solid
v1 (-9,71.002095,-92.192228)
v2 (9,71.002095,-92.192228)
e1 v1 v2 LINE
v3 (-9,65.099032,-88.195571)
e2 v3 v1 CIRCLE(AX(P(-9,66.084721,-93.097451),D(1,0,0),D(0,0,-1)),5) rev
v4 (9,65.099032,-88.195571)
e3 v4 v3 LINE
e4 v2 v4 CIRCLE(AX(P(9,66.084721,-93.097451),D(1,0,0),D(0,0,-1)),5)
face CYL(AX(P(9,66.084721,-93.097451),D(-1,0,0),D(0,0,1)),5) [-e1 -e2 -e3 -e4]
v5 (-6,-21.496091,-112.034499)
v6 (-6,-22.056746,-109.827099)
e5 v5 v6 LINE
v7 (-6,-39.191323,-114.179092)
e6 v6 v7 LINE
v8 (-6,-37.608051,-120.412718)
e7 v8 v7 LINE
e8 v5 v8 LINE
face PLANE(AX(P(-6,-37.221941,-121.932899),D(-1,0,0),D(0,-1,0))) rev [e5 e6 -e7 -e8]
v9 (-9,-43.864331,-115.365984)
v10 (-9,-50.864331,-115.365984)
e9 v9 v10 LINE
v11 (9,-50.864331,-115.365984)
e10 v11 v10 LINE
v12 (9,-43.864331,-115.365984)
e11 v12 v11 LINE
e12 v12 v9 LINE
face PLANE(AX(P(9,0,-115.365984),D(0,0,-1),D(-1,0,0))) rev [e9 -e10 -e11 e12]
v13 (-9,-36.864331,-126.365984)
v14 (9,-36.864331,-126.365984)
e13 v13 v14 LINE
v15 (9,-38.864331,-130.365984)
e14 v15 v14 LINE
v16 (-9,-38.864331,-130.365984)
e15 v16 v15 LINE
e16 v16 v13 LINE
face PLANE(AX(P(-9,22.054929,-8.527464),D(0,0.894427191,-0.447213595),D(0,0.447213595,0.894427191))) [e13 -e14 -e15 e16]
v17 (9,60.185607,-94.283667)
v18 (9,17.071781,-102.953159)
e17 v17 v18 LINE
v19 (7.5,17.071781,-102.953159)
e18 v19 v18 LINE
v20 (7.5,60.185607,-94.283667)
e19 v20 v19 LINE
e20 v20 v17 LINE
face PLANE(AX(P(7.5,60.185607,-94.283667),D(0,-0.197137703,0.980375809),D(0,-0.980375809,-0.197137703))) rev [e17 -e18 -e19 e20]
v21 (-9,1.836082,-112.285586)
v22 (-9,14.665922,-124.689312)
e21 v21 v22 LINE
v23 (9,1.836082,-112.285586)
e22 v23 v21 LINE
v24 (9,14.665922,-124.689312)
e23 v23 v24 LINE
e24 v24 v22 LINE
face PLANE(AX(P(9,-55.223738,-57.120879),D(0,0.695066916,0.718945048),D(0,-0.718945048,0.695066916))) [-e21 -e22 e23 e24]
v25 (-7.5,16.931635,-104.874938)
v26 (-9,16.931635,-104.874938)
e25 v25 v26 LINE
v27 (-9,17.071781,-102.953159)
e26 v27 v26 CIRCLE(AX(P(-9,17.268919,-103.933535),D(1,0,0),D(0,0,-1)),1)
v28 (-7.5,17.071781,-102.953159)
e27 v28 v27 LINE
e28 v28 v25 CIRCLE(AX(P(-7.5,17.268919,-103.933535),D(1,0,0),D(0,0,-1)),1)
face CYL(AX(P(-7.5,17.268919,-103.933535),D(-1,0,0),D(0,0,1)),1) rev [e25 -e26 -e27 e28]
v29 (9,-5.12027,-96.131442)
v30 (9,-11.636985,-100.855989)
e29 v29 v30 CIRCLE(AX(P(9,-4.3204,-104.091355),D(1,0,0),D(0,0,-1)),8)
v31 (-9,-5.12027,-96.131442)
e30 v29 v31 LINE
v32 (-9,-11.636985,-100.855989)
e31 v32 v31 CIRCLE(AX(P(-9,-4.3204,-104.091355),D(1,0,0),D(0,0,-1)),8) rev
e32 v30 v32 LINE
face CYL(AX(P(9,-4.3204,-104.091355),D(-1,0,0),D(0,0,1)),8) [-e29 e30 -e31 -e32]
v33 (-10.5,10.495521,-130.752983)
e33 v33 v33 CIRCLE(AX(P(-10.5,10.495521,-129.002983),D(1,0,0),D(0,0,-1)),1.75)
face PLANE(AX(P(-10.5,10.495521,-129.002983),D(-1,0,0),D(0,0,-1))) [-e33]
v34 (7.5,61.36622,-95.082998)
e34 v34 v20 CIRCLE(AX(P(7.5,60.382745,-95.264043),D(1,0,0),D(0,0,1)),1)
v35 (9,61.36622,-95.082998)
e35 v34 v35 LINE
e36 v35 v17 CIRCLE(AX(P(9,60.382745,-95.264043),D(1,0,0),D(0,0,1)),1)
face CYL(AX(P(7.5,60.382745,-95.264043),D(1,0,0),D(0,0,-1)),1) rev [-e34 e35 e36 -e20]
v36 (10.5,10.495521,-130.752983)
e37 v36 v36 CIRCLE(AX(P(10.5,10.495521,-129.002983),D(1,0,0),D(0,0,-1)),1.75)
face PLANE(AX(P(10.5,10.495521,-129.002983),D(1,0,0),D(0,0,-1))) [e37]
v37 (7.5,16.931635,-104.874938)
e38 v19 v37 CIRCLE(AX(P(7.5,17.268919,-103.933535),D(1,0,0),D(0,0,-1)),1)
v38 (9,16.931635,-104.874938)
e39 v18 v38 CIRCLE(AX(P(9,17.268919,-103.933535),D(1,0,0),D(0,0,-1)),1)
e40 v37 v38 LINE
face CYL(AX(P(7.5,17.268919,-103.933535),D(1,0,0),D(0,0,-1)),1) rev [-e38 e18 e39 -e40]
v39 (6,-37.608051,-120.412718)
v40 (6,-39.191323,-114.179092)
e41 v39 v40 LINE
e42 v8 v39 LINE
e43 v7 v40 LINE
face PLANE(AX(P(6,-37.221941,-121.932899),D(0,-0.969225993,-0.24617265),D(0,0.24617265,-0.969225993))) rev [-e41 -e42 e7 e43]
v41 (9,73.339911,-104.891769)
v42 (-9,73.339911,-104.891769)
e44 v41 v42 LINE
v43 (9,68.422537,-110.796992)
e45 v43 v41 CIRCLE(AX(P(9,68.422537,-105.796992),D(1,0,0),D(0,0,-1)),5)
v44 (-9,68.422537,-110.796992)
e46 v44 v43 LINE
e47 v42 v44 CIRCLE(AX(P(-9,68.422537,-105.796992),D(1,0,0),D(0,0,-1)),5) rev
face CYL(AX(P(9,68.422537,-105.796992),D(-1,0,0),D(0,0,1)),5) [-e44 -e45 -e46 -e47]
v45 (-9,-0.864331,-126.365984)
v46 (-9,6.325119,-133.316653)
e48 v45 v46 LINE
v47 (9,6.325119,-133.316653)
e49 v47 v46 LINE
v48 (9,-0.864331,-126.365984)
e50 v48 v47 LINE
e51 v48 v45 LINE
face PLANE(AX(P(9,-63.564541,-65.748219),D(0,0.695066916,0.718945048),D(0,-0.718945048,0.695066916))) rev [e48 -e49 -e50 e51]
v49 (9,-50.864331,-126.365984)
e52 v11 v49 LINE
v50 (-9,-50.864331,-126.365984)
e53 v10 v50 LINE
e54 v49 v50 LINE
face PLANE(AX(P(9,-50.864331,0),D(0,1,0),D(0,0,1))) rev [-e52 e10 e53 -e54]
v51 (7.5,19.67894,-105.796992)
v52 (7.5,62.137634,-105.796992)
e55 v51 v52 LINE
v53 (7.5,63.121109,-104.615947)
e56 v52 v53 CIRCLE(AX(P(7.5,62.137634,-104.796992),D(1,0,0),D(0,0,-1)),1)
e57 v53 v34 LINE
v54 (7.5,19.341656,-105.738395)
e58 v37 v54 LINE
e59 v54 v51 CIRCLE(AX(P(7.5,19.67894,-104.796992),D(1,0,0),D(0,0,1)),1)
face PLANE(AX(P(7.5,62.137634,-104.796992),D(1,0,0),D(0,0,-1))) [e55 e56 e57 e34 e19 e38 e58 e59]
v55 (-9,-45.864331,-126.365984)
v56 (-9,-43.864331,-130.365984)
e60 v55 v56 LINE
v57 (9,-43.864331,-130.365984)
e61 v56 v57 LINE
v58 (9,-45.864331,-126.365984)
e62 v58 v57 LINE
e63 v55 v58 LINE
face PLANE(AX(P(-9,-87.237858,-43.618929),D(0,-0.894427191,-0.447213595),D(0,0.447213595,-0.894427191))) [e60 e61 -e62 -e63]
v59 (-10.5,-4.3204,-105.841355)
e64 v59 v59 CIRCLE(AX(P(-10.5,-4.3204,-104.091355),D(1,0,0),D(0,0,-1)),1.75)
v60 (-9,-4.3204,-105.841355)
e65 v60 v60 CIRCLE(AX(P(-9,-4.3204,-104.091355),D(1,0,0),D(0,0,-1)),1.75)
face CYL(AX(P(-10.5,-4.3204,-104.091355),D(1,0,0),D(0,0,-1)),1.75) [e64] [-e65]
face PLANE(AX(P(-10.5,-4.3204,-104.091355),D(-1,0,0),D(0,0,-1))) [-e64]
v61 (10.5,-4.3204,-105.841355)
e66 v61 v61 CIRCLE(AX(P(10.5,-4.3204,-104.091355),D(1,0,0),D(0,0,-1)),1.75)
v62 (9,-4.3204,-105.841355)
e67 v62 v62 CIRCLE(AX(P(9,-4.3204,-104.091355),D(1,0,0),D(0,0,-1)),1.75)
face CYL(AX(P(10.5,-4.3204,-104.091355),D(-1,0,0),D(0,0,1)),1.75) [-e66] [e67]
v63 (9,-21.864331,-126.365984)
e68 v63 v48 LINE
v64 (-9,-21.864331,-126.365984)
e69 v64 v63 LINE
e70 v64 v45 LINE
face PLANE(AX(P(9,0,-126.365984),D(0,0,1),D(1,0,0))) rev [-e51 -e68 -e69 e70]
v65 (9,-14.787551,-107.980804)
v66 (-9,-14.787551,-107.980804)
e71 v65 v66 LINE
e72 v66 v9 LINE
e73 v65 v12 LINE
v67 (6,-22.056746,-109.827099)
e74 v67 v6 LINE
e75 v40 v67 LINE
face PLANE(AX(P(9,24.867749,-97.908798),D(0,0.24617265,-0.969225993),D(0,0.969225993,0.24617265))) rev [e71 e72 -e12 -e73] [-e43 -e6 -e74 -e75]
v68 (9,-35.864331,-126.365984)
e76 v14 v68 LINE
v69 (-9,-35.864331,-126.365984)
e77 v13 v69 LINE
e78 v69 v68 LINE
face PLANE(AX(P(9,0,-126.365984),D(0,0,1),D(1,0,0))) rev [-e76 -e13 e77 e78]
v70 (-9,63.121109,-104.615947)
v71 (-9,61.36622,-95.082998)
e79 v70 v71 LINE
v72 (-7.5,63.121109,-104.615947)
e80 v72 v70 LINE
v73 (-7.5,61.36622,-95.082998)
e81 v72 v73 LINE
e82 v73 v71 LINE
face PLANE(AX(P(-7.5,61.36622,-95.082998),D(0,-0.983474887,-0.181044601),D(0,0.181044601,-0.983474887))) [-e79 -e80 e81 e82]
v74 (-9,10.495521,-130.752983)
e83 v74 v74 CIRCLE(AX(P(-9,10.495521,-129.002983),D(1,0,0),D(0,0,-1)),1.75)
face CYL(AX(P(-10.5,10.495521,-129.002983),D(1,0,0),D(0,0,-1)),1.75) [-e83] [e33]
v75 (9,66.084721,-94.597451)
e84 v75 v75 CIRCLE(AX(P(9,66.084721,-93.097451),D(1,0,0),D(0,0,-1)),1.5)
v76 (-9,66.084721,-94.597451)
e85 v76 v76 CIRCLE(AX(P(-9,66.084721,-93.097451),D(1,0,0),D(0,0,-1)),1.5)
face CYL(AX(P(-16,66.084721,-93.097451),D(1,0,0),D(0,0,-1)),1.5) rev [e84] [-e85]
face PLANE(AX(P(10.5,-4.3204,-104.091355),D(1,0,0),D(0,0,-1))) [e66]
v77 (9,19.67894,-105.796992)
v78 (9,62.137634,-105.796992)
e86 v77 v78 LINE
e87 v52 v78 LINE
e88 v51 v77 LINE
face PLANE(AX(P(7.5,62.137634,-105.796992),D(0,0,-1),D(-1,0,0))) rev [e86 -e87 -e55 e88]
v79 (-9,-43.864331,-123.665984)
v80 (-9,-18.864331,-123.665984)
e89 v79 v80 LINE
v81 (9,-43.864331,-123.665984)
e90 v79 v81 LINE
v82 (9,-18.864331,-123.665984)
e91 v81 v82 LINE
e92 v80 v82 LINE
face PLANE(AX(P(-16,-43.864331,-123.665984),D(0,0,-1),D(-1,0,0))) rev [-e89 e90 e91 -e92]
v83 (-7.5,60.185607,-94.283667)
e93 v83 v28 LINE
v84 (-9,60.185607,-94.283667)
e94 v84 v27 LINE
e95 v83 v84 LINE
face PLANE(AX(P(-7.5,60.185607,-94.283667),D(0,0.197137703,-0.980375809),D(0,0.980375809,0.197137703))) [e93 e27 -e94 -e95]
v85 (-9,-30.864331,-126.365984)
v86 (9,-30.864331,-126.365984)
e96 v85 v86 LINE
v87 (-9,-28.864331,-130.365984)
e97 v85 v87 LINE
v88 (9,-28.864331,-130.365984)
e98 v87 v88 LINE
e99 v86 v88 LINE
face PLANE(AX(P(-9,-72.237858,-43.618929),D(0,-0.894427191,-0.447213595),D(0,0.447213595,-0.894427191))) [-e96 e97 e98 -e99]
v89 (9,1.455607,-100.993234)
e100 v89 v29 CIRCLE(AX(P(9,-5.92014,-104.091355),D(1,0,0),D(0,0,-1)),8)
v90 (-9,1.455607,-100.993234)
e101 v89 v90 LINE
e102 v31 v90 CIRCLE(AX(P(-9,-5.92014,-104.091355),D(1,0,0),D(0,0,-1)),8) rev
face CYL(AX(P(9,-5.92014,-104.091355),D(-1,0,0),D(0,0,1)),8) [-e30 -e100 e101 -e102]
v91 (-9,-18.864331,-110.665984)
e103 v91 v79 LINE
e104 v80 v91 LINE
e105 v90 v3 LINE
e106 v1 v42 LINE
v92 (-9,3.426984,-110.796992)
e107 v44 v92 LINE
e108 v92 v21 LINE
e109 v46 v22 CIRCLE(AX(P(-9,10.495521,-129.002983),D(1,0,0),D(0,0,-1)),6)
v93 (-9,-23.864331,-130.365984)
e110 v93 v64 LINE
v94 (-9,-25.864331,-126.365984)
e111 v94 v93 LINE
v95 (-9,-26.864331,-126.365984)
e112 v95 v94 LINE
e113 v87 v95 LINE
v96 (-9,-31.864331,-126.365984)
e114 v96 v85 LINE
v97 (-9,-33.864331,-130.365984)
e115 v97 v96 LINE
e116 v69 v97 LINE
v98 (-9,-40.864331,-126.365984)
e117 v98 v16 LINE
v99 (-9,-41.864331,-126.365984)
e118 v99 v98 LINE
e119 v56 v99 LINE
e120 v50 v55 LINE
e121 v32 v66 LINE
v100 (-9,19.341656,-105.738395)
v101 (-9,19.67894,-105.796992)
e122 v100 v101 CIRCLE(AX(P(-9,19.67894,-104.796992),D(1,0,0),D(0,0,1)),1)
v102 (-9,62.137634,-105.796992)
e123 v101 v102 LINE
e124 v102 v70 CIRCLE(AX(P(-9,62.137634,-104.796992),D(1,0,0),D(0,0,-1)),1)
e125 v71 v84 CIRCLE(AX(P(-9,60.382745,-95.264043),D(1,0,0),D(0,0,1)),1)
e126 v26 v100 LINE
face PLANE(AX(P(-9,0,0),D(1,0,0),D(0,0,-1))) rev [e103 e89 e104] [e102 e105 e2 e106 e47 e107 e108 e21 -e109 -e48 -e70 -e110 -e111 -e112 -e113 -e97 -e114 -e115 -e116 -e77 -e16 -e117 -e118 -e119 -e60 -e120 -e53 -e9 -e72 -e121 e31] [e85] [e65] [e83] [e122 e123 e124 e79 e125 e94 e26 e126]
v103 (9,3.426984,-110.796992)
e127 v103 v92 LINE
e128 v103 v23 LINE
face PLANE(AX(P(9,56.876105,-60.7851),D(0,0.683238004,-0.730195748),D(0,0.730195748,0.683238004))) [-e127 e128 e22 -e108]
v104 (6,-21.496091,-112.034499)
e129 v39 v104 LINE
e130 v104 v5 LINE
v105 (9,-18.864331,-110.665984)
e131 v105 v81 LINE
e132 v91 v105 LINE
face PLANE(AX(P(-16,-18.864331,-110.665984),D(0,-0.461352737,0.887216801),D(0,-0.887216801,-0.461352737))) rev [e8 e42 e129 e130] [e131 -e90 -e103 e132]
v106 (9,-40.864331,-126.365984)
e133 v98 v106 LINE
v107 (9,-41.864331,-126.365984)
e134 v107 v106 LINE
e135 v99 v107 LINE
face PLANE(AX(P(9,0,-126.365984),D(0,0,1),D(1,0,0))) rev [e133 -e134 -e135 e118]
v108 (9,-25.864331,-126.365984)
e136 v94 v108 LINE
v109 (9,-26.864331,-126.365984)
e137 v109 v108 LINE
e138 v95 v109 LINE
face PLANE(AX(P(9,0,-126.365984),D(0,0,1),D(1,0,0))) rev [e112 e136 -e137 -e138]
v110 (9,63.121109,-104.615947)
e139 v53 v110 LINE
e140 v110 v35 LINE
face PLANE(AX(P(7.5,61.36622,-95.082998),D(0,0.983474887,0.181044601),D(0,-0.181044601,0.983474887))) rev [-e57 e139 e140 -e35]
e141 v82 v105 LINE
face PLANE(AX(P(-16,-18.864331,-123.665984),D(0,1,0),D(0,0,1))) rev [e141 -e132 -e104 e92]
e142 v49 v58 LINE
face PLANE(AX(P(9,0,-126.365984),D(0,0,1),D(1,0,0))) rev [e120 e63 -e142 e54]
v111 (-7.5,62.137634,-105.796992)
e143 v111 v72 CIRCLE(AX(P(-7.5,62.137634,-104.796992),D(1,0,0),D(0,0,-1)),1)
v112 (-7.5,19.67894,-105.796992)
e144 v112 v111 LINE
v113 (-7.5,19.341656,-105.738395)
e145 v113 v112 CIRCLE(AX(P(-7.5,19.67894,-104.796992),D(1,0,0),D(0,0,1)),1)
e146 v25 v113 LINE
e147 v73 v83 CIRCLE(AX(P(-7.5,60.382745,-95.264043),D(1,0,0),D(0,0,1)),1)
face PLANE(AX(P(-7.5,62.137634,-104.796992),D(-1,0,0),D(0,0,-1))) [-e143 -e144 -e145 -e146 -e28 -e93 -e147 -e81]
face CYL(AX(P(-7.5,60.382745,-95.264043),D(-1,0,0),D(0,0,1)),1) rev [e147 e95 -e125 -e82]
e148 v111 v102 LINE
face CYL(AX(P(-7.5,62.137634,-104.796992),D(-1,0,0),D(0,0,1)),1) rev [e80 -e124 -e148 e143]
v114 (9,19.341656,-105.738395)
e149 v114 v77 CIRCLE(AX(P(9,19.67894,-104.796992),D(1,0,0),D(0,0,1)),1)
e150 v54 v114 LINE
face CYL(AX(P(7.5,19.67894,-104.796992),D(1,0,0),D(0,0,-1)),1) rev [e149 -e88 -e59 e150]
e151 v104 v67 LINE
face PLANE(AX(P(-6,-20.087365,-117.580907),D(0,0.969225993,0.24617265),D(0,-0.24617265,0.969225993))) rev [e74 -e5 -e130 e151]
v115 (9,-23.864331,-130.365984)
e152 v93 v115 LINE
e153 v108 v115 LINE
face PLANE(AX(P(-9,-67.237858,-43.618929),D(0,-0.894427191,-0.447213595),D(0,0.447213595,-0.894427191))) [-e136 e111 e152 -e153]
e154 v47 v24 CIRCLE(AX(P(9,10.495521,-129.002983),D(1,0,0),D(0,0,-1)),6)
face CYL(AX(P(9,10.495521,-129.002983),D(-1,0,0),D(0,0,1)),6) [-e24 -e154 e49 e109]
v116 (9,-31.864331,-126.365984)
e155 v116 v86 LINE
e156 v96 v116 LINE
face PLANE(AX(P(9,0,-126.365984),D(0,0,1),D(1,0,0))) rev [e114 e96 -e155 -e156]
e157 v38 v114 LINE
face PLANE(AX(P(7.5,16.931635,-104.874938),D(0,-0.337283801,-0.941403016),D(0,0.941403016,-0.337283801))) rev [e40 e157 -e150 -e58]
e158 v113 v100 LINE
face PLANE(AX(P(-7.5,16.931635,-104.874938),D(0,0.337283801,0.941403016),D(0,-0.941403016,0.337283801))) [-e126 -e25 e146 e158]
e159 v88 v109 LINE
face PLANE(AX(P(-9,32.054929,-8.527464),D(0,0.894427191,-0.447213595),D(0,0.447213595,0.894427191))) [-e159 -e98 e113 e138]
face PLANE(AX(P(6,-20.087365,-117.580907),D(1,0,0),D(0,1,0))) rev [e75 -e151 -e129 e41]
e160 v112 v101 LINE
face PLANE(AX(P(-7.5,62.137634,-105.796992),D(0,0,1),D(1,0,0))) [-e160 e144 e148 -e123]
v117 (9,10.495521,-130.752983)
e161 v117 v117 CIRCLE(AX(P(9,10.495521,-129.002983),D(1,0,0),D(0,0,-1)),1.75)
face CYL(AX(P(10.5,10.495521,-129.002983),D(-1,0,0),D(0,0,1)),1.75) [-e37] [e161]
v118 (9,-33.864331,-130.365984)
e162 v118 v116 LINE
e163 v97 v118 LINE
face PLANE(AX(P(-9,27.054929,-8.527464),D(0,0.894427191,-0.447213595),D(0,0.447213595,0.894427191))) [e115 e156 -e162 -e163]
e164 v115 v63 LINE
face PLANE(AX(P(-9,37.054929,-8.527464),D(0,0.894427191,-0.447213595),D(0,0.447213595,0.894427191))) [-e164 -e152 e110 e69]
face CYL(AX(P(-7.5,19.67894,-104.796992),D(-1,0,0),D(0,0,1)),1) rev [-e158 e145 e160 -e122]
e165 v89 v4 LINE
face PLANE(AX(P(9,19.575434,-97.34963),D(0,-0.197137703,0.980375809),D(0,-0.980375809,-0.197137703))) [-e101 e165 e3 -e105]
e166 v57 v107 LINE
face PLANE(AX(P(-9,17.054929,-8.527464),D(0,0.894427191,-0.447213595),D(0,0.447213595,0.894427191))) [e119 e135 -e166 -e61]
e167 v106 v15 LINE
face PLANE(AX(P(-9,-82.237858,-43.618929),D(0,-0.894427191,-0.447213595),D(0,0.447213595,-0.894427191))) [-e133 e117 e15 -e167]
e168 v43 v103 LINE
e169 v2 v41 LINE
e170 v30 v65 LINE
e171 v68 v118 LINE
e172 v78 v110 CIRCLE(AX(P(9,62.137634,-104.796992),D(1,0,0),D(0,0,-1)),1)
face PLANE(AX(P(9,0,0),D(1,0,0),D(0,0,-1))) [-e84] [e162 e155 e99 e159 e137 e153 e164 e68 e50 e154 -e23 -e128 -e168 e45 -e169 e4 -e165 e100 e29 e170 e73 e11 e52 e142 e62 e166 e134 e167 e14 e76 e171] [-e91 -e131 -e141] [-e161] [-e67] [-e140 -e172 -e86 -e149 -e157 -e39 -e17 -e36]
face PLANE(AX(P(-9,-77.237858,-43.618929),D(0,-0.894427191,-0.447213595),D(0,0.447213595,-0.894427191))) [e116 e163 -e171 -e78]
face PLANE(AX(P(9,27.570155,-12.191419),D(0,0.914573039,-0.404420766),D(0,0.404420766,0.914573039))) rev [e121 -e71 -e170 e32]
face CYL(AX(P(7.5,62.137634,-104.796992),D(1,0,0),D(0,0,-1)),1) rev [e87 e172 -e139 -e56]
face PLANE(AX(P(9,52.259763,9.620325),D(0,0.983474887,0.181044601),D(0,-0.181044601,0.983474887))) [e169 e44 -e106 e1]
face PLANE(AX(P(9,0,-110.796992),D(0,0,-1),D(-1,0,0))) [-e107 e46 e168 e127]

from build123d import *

# Parameters (mm, degrees)
BOSS_EXTRUDE1_DEPTH = 9
CUT_EXTRUDE1_DEPTH  = 25
BOSS_EXTRUDE2_DEPTH = 18
LPATTERN1_COUNT     = 5
LPATTERN1_PITCH     = 5
FILLET2_R           = 8
FILLET3_R           = 5
SKETCH7_R           = 1.5
CUT_EXTRUDE2_DEPTH  = 25
SKETCH8_W           = 12
SKETCH8_H           = 17.678618226
CUT_EXTRUDE4_DEPTH  = 8
SKETCH10_R          = 1.75
BOSS_EXTRUDE3_DEPTH = 1.5
SKETCH11_R          = 1.75
BOSS_EXTRUDE5_DEPTH = 1.5
CUT_EXTRUDE5_DEPTH  = 1.5


with BuildPart() as part:
    # Sketch4 → Boss-Extrude1 (new, symmetric)
    with BuildSketch(Plane(origin=(0, 0, 0), x_dir=(0, 0, -1), z_dir=(1, 0, 0))):
        Polygon((110.796991994, 3.426984131), (100.993233908, 1.455607104), (87.193594717, 70.081913709), (110.796991994, 74.426984131), align=None)
        Polygon((126.36598388, -0.864331166), (133.316653042, 6.325119314), (124.689312466, 14.665922308), (112.285585973, 1.836081711), (110.796991994, 3.426984131), (100.993233908, 1.455607104), (96.091354865, 0.469918591), (96.091354865, -9.530081409), (107.980804376, -14.787551363), (115.36598388, -43.864331166), (115.36598388, -50.864331166), (126.36598388, -50.864331166), align=None)
        with BuildLine():
            Line((133.316653042, 6.325119314), (124.689312466, 14.665922308))
            ThreePointArc((124.689312466, 14.665922308), (133.173384251, 14.809191099), (133.316653042, 6.325119314))
        make_face()
    extrude(amount=BOSS_EXTRUDE1_DEPTH, both=True)

    # Sketch5 → Cut-Extrude1 (cut)
    with BuildSketch(Plane(origin=(9, 0, 0), x_dir=(0, 0, -1), z_dir=(1, 0, 0))):
        Polygon((123.66598388, -43.864331166), (123.66598388, -18.864331166), (110.66598388, -18.864331166), align=None)
    extrude(amount=-CUT_EXTRUDE1_DEPTH, mode=Mode.SUBTRACT)

    # Sketch6 → Boss-Extrude2 (add)
    with BuildSketch(Plane(origin=(9, 0, 0), x_dir=(0, 0, -1), z_dir=(1, 0, 0))):
        Polygon((126.36598388, -43.864331166), (130.36598388, -43.864331166), (126.36598388, -41.864331166), align=None)
        Polygon((126.36598388, -43.864331166), (126.36598388, -45.864331166), (130.36598388, -43.864331166), align=None)
    boss_extrude2 = extrude(amount=-BOSS_EXTRUDE2_DEPTH)

    # LPattern1: Boss-Extrude2 ×5
    with Locations(*[(0, i * LPATTERN1_PITCH, 0) for i in range(1, LPATTERN1_COUNT)]):
        add(boss_extrude2)

    # Fillet2
    # the kernel refuses this fillet: 8 mm, written as the material it takes off along each edge
    with BuildSketch(Plane(origin=(-22.024202742, -9.530081409, -96.091354865), x_dir=(0, -0.4044207656516306, -0.9145730393521061), z_dir=(1, 0, 0))) as fillet2_piece_1:
        with BuildLine():
            CenterArc((FILLET2_R * 0.651210137104, FILLET2_R), FILLET2_R, 203.854834431, 66.145165569)
            Line((-FILLET2_R * 0.263362902248, FILLET2_R * 0.595579234348), (-FILLET2_R * 0.281654363035, FILLET2_R * 0.587490819035))
            Line((-FILLET2_R * 0.281654363035, FILLET2_R * 0.587490819035), (-FILLET2_R * 0.0130242027421, -FILLET2_R * 0.02))
            Line((-FILLET2_R * 0.0130242027421, -FILLET2_R * 0.02), (FILLET2_R * 0.651210137104, -FILLET2_R * 0.02))
            Line((FILLET2_R * 0.651210137104, -FILLET2_R * 0.02), (FILLET2_R * 0.651210137104, 0))
        make_face()
    extrude(amount=44.048405484, mode=Mode.SUBTRACT)
    with BuildSketch(Plane(origin=(-24.975146678, 0.469918591, -96.091354865), x_dir=(0, -1, 0), z_dir=(1, 0, 0))) as fillet2_piece_2:
        with BuildLine():
            CenterArc((6.390058671, 8), FILLET2_R, 202.784433835, 67.215566165)
            Line((-0.985688514, 4.901879043), (-1.133203457, 4.839916624))
            ThreePointArc((-1.133203457, 4.839916624), (-0.649704386, 2.419397489), (-0.156860129, -0.031542032))
            Line((-0.156860129, -0.031542032), (0, -0.16))
            Line((0, -0.16), (6.390058671, -0.16))
            Line((6.390058671, -0.16), (6.390058671, 0))
        make_face()
    extrude(amount=49.950293357, mode=Mode.SUBTRACT)

    # Fillet3
    fillet3_edges = [part.edges().sort_by_distance(p)[0] for p in [
        (0, 70.081913709, -87.193594717),
        (0, 74.426984131, -110.796991994),
    ]]
    fillet(fillet3_edges, radius=FILLET3_R)

    # Sketch7 → Cut-Extrude2 (cut)
    with BuildSketch(Plane(origin=(9, 0, 0), x_dir=(0, 0, -1), z_dir=(1, 0, 0))):
        with Locations((93.097450529, 66.084720863)):
            Circle(SKETCH7_R)
    extrude(amount=-CUT_EXTRUDE2_DEPTH, mode=Mode.SUBTRACT)

    # Sketch8 → Cut-Extrude4 (cut)
    with BuildSketch(Plane(origin=(0, 24.86774856, -97.908798117), x_dir=(1, 0, 0), z_dir=(0, -0.246172650114547, 0.9692259934275292))):
        with Locations((0, -57.253709048)):
            Rectangle(SKETCH8_W, SKETCH8_H)
    extrude(amount=-CUT_EXTRUDE4_DEPTH, mode=Mode.SUBTRACT)

    # Sketch10 → Boss-Extrude3 (add)
    with BuildSketch(Plane(origin=(9, 0, 0), x_dir=(0, 0, -1), z_dir=(1, 0, 0))):
        with Locations((129.002982754, 10.495520811)):
            Circle(SKETCH10_R)
    boss_extrude3 = extrude(amount=BOSS_EXTRUDE3_DEPTH)

    # Sketch11 → Boss-Extrude5 (add)
    with BuildSketch(Plane(origin=(9, 0, 0), x_dir=(0, 0, -1), z_dir=(1, 0, 0))):
        with Locations((104.091354865, -4.320400313)):
            Circle(SKETCH11_R)
    boss_extrude5 = extrude(amount=BOSS_EXTRUDE5_DEPTH)

    # Sketch12 → Cut-Extrude5 (cut)
    with BuildSketch(Plane(origin=(9, 0, 0), x_dir=(0, 0, -1), z_dir=(1, 0, 0))):
        with BuildLine():
            Line((105.796991994, 62.137633614), (105.796991994, 19.67893978))
            ThreePointArc((105.796991994, 19.67893978), (105.782233847, 19.507771757), (105.73839501, 19.341655979))
            Line((105.73839501, 19.341655979), (104.874938008, 16.931635031))
            ThreePointArc((104.874938008, 16.931635031), (103.860802938, 16.271567315), (102.953159184, 17.071781129))
            Line((102.953159184, 17.071781129), (94.283666788, 60.185607156))
            ThreePointArc((94.283666788, 60.185607156), (94.435981087, 60.943382118), (95.082997995, 61.366219745))
            Line((95.082997995, 61.366219745), (104.615947394, 63.121108501))
            ThreePointArc((104.615947394, 63.121108501), (105.43689644, 62.906088102), (105.796991994, 62.137633614))
        make_face()
    cut_extrude5 = extrude(amount=-CUT_EXTRUDE5_DEPTH, mode=Mode.SUBTRACT)

    # Mirror1: Boss-Extrude3, Boss-Extrude5, Cut-Extrude5 across plane
    add(boss_extrude3.mirror(Plane(origin=(0, 0, 0), x_dir=(0, 0, 1), z_dir=(1, 0, 0))))
    add(boss_extrude5.mirror(Plane(origin=(0, 0, 0), x_dir=(0, 0, 1), z_dir=(1, 0, 0))))
    add(cut_extrude5.mirror(Plane(origin=(0, 0, 0), x_dir=(0, 0, 1), z_dir=(1, 0, 0))), mode=Mode.SUBTRACT)


solid = part.part
